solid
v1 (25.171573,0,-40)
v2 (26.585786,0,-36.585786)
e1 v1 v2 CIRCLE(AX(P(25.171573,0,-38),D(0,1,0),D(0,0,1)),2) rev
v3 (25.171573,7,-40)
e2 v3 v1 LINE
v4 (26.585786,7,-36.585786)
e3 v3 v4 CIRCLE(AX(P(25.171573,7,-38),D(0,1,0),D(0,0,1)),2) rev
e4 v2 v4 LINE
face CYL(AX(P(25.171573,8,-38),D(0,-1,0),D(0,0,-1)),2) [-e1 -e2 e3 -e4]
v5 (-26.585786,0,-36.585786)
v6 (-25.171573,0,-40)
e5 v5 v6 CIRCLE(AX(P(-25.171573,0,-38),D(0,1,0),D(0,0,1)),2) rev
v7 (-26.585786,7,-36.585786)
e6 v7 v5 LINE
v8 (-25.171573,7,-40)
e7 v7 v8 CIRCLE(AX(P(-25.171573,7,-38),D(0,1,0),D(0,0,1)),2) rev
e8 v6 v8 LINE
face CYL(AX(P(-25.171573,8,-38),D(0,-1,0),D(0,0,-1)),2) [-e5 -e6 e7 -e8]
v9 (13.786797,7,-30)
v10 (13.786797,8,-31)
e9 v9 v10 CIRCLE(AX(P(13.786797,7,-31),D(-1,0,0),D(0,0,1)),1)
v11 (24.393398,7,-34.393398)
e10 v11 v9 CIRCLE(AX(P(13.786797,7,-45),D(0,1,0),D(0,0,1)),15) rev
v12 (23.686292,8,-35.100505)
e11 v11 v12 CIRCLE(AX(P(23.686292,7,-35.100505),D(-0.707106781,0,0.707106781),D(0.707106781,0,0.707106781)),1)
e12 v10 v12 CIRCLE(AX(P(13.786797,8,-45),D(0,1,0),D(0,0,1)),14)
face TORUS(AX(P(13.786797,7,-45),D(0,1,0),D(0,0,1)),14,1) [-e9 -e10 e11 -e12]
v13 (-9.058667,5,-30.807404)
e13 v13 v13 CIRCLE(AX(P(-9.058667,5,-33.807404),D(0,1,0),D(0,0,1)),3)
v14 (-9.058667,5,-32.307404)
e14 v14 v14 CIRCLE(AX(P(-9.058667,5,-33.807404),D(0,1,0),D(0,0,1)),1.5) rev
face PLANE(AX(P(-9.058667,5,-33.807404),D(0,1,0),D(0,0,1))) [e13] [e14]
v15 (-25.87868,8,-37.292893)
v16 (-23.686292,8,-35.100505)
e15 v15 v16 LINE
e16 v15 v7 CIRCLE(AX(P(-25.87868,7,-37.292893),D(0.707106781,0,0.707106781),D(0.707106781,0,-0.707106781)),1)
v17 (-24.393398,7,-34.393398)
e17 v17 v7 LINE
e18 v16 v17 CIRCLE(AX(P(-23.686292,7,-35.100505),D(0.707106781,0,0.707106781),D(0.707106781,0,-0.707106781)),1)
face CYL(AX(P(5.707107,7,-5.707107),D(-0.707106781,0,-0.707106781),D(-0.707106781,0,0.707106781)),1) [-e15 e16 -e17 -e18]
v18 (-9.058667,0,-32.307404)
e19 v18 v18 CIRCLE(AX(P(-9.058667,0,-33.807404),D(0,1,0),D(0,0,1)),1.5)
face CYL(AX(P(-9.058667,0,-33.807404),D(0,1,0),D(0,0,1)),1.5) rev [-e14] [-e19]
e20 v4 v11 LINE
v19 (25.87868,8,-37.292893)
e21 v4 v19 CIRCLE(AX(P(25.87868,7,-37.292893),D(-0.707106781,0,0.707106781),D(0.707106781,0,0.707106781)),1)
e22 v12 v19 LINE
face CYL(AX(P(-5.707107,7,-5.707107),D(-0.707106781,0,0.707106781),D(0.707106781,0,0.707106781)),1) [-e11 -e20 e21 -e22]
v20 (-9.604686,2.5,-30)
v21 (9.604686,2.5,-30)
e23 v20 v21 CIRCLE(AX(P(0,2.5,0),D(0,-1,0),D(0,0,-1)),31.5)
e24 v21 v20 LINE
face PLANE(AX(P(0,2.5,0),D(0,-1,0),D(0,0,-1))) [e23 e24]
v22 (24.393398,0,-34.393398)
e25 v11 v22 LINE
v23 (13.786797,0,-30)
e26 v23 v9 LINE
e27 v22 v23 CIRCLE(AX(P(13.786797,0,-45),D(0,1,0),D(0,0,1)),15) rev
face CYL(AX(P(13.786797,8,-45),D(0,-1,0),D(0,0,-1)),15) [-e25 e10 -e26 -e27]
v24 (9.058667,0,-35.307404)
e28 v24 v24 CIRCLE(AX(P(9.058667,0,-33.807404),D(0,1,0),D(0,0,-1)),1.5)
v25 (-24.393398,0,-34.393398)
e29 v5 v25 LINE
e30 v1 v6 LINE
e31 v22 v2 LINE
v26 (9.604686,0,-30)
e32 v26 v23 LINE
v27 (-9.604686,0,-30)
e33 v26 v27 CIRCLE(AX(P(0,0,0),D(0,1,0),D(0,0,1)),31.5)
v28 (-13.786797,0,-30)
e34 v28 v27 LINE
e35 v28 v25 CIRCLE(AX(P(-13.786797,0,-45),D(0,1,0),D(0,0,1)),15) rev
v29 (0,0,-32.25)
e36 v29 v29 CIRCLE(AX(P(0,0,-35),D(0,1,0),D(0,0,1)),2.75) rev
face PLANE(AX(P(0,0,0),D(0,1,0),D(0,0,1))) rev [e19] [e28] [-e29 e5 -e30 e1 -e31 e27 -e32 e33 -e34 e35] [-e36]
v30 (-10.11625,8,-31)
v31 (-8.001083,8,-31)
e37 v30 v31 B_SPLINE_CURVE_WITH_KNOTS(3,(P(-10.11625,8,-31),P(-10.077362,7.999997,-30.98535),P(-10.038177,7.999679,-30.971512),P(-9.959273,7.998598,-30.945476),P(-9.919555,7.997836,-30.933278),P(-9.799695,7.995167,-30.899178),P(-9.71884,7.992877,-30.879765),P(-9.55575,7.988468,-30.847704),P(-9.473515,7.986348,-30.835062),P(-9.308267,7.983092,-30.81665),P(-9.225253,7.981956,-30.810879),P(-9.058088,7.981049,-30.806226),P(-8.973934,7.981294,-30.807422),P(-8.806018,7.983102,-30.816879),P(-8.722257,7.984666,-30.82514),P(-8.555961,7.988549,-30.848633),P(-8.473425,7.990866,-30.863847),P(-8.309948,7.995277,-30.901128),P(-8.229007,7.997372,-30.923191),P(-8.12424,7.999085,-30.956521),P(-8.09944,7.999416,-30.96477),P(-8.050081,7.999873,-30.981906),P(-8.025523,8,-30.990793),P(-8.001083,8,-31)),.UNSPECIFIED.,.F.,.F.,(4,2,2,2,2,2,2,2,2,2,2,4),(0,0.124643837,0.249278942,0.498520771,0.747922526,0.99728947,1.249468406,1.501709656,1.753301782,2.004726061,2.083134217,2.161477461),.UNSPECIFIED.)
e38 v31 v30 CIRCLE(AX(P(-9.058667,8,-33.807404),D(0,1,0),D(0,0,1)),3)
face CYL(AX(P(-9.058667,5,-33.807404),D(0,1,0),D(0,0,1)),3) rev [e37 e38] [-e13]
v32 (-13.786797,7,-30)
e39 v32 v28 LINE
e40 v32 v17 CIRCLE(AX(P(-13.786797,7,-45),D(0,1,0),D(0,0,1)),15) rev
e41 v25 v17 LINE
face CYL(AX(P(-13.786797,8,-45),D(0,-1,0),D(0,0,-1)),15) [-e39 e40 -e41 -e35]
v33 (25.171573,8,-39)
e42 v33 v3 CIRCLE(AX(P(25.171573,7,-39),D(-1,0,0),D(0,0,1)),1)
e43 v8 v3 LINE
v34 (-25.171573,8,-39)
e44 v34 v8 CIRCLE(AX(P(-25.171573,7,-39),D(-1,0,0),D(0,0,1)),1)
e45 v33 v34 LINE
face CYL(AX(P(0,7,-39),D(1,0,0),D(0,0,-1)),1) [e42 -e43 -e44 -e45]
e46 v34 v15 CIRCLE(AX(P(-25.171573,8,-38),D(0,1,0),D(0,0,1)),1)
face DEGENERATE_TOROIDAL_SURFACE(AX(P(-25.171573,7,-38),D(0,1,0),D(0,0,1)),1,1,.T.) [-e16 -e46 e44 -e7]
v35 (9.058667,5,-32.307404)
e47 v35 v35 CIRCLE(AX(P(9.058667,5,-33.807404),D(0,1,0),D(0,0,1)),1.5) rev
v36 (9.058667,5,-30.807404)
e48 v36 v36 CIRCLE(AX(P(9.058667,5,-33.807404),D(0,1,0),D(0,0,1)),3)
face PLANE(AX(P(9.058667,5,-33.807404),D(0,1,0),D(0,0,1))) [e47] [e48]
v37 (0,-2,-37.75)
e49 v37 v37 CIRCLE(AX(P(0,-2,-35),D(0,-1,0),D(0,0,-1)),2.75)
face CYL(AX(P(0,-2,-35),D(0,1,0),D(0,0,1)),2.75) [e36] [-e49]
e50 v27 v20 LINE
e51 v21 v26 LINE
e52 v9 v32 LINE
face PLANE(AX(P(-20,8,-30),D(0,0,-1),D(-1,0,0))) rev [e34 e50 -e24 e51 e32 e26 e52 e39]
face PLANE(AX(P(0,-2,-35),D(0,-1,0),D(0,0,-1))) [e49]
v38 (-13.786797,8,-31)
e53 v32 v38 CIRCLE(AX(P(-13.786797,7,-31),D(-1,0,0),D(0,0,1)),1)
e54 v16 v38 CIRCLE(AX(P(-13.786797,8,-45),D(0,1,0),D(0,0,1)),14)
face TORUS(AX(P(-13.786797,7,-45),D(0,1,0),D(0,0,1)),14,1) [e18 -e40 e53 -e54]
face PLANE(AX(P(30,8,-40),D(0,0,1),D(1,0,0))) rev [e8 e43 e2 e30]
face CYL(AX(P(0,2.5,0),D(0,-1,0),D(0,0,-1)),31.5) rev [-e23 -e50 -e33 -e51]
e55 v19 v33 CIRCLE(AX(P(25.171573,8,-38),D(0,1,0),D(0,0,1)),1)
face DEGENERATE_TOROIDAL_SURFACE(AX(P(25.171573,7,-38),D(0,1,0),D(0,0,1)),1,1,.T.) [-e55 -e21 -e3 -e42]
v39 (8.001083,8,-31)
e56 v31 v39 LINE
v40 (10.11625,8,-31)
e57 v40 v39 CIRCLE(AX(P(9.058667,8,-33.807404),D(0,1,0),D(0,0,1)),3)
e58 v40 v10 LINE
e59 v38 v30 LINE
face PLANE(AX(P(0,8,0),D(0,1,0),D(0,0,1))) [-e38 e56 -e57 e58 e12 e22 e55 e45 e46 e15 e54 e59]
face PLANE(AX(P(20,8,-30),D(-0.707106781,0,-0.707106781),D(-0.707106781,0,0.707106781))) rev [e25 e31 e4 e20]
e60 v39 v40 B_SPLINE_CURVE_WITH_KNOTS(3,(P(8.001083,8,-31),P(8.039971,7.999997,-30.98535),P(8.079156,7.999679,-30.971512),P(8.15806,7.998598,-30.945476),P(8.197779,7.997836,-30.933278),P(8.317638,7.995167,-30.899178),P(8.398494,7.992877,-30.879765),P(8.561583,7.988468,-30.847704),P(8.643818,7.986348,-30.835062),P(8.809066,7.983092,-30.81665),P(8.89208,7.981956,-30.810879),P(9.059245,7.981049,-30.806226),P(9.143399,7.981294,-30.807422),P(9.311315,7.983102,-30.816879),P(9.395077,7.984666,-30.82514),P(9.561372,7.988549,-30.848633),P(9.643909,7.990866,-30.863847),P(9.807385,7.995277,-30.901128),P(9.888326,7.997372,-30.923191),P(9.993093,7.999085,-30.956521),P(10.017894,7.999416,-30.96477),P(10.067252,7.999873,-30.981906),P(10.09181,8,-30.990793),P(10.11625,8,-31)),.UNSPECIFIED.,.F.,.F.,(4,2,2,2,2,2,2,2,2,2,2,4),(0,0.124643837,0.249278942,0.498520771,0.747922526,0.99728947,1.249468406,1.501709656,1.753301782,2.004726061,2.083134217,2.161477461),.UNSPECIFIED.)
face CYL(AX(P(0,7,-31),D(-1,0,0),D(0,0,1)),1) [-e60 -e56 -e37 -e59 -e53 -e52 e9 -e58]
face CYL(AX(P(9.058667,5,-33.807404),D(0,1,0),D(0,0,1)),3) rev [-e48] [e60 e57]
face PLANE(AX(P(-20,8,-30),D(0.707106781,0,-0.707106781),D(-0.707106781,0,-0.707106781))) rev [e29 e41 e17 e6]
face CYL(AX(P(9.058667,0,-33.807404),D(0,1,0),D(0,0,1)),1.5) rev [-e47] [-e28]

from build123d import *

# Parameters (mm, degrees)
EXTRUDE_1_DEPTH     = 8
SKETCH_4_R          = 31.5
CUT_EXTRUDE_1_DEPTH = 2.5
SKETCH_5_R          = 1.5
CUT_EXTRUDE_2_DEPTH = 51.635955605
SKETCH_6_R          = 3
CUT_EXTRUDE_3_DEPTH = 3
SKETCH_7_R          = 2.75
EXTRUDE_2_DEPTH     = 2
FILLET_1_R          = 15
FILLET_2_R          = 2
FILLET_3_R          = 1


with BuildPart() as part:
    # 草图3 → 凸台-拉伸1 (new body)
    with BuildSketch(Plane(origin=(0, 0, 0), x_dir=(1, 0, 0), z_dir=(0, 1, 0))):
        Polygon((-20, 30), (20, 30), (30, 40), (-30, 40), align=None)
    extrude(amount=EXTRUDE_1_DEPTH)

    # 草图4 → 切除-拉伸1 (cut)
    with BuildSketch(Plane.XZ):
        Circle(SKETCH_4_R)
    extrude(amount=-CUT_EXTRUDE_1_DEPTH, mode=Mode.SUBTRACT)

    # 草图5 → 切除-拉伸2 (cut, through all)
    with BuildSketch(Plane(origin=(0, 8, 0), x_dir=(1, 0, 0), z_dir=(0, 1, 0))):
        with Locations(Location((-9.058666579, 33.80740392, 0), (0, 0, 270))):
            Circle(SKETCH_5_R)
        with Locations(Location((9.058666579, 33.80740392, 0), (0, 0, 90))):
            Circle(SKETCH_5_R)
    extrude(amount=-CUT_EXTRUDE_2_DEPTH, mode=Mode.SUBTRACT)

    # 草图6 → 切除-拉伸3 (cut)
    with BuildSketch(Plane(origin=(0, 8, 0), x_dir=(1, 0, 0), z_dir=(0, 1, 0))):
        with Locations(Location((-9.058666579, 33.80740392, 0), (0, 0, 270))):
            Circle(SKETCH_6_R)
        with Locations(Location((9.058666579, 33.80740392, 0), (0, 0, 270))):
            Circle(SKETCH_6_R)
    extrude(amount=-CUT_EXTRUDE_3_DEPTH, mode=Mode.SUBTRACT)

    # 草图7 → 凸台-拉伸2 (add)
    with BuildSketch(Plane.XZ):
        with Locations(Location((0, -35, 0), (0, 0, 90))):
            Circle(SKETCH_7_R)
    extrude(amount=EXTRUDE_2_DEPTH)

    # 圆角1
    fillet_1_edges = [part.edges().sort_by_distance(p)[0] for p in [
        (20, 4, -30),
        (-20, 4, -30),
    ]]
    fillet(fillet_1_edges, radius=FILLET_1_R)

    # 圆角2
    fillet_2_edges = [part.edges().sort_by_distance(p)[0] for p in [
        (-30, 4, -40),
        (30, 4, -40),
    ]]
    fillet(fillet_2_edges, radius=FILLET_2_R)

    # 圆角3
    # the kernel refuses this fillet: 1 mm, written as the material it takes off along each edge
    with BuildSketch(Plane(origin=(24.393398282, 8, -34.393398282), x_dir=(0, -1, 0), z_dir=(0.7071067811865472, 0, -0.7071067811865478)), Plane(origin=(-26.585786438, 8, -36.585786438), x_dir=(0, -1, 0), z_dir=(0.7071067811865472, 0, 0.7071067811865478))) as fillet_3_piece_1:
        with BuildLine():
            CenterArc((FILLET_3_R, FILLET_3_R), FILLET_3_R, 180, 90)
            Line((0, FILLET_3_R), (0, 0))
            Line((0, 0), (FILLET_3_R, 0))
        make_face()
    extrude(amount=3.100505063, mode=Mode.SUBTRACT)
    with BuildSketch(Plane(origin=(-13.786796564, 8, -30), x_dir=(0, -1, 0), z_dir=(1, 0, 0))) as fillet_3_piece_2:
        with BuildLine():
            CenterArc((FILLET_3_R, FILLET_3_R), FILLET_3_R, 180, 90)
            Line((0, FILLET_3_R), (0, 0))
            Line((0, 0), (FILLET_3_R, 0))
        make_face()
    extrude(amount=27.573593129, mode=Mode.SUBTRACT)
    with BuildSketch(Plane(origin=(-13.786796564, 8, -45), x_dir=(0, 0, 1), z_dir=(1, 0, 0))) as fillet_3_piece_3:
        with BuildLine():
            CenterArc((15 - FILLET_3_R, FILLET_3_R), FILLET_3_R, 270, 90)
            Line((15 - FILLET_3_R, 0), (15, 0))
            Line((15, 0), (15, FILLET_3_R))
        make_face()
    revolve(axis=Axis((-13.786796564, 8, -45), (0, -1, 0)), revolution_arc=45, mode=Mode.SUBTRACT)
    with BuildSketch(Plane(origin=(13.786796564, 8, -45), x_dir=(0, 0, 1), z_dir=(-1, 0, 0))) as fillet_3_piece_4:
        with BuildLine():
            CenterArc((15 - FILLET_3_R, -FILLET_3_R), FILLET_3_R, 0, 90)
            Line((15 - FILLET_3_R, 0), (15, 0))
            Line((15, 0), (15, -FILLET_3_R))
        make_face()
    revolve(axis=Axis((13.786796564, 8, -45), (0, 1, 0)), revolution_arc=45, mode=Mode.SUBTRACT)
    with BuildSketch(Plane(origin=(25.171572875, 8, -40), x_dir=(0, -1, 0), z_dir=(-1, 0, 0))) as fillet_3_piece_5:
        with BuildLine():
            CenterArc((FILLET_3_R, FILLET_3_R), FILLET_3_R, 180, 90)
            Line((0, FILLET_3_R), (0, 0))
            Line((0, 0), (FILLET_3_R, 0))
        make_face()
    extrude(amount=50.343145751, mode=Mode.SUBTRACT)
    with BuildSketch(Plane(origin=(-25.171572875, 8, -38), x_dir=(-0.7071067811865458, 0, 0.7071067811865493), z_dir=(0.7071067811865493, 0, 0.7071067811865458))) as fillet_3_piece_6:
        with BuildLine():
            CenterArc((2 - FILLET_3_R, FILLET_3_R), FILLET_3_R, 270, 90)
            Line((2 - FILLET_3_R, 0), (2, 0))
            Line((2, 0), (2, FILLET_3_R))
        make_face()
    revolve(axis=Axis((-25.171572875, 8, -38), (0, -1, 0)), revolution_arc=135, mode=Mode.SUBTRACT)
    with BuildSketch(Plane(origin=(25.171572875, 8, -38), x_dir=(0, 0, -1), z_dir=(-1, 0, 0))) as fillet_3_piece_7:
        with BuildLine():
            CenterArc((2 - FILLET_3_R, FILLET_3_R), FILLET_3_R, 270, 90)
            Line((2 - FILLET_3_R, 0), (2, 0))
            Line((2, 0), (2, FILLET_3_R))
        make_face()
    revolve(axis=Axis((25.171572875, 8, -38), (0, -1, 0)), revolution_arc=135, mode=Mode.SUBTRACT)


solid = part.part
